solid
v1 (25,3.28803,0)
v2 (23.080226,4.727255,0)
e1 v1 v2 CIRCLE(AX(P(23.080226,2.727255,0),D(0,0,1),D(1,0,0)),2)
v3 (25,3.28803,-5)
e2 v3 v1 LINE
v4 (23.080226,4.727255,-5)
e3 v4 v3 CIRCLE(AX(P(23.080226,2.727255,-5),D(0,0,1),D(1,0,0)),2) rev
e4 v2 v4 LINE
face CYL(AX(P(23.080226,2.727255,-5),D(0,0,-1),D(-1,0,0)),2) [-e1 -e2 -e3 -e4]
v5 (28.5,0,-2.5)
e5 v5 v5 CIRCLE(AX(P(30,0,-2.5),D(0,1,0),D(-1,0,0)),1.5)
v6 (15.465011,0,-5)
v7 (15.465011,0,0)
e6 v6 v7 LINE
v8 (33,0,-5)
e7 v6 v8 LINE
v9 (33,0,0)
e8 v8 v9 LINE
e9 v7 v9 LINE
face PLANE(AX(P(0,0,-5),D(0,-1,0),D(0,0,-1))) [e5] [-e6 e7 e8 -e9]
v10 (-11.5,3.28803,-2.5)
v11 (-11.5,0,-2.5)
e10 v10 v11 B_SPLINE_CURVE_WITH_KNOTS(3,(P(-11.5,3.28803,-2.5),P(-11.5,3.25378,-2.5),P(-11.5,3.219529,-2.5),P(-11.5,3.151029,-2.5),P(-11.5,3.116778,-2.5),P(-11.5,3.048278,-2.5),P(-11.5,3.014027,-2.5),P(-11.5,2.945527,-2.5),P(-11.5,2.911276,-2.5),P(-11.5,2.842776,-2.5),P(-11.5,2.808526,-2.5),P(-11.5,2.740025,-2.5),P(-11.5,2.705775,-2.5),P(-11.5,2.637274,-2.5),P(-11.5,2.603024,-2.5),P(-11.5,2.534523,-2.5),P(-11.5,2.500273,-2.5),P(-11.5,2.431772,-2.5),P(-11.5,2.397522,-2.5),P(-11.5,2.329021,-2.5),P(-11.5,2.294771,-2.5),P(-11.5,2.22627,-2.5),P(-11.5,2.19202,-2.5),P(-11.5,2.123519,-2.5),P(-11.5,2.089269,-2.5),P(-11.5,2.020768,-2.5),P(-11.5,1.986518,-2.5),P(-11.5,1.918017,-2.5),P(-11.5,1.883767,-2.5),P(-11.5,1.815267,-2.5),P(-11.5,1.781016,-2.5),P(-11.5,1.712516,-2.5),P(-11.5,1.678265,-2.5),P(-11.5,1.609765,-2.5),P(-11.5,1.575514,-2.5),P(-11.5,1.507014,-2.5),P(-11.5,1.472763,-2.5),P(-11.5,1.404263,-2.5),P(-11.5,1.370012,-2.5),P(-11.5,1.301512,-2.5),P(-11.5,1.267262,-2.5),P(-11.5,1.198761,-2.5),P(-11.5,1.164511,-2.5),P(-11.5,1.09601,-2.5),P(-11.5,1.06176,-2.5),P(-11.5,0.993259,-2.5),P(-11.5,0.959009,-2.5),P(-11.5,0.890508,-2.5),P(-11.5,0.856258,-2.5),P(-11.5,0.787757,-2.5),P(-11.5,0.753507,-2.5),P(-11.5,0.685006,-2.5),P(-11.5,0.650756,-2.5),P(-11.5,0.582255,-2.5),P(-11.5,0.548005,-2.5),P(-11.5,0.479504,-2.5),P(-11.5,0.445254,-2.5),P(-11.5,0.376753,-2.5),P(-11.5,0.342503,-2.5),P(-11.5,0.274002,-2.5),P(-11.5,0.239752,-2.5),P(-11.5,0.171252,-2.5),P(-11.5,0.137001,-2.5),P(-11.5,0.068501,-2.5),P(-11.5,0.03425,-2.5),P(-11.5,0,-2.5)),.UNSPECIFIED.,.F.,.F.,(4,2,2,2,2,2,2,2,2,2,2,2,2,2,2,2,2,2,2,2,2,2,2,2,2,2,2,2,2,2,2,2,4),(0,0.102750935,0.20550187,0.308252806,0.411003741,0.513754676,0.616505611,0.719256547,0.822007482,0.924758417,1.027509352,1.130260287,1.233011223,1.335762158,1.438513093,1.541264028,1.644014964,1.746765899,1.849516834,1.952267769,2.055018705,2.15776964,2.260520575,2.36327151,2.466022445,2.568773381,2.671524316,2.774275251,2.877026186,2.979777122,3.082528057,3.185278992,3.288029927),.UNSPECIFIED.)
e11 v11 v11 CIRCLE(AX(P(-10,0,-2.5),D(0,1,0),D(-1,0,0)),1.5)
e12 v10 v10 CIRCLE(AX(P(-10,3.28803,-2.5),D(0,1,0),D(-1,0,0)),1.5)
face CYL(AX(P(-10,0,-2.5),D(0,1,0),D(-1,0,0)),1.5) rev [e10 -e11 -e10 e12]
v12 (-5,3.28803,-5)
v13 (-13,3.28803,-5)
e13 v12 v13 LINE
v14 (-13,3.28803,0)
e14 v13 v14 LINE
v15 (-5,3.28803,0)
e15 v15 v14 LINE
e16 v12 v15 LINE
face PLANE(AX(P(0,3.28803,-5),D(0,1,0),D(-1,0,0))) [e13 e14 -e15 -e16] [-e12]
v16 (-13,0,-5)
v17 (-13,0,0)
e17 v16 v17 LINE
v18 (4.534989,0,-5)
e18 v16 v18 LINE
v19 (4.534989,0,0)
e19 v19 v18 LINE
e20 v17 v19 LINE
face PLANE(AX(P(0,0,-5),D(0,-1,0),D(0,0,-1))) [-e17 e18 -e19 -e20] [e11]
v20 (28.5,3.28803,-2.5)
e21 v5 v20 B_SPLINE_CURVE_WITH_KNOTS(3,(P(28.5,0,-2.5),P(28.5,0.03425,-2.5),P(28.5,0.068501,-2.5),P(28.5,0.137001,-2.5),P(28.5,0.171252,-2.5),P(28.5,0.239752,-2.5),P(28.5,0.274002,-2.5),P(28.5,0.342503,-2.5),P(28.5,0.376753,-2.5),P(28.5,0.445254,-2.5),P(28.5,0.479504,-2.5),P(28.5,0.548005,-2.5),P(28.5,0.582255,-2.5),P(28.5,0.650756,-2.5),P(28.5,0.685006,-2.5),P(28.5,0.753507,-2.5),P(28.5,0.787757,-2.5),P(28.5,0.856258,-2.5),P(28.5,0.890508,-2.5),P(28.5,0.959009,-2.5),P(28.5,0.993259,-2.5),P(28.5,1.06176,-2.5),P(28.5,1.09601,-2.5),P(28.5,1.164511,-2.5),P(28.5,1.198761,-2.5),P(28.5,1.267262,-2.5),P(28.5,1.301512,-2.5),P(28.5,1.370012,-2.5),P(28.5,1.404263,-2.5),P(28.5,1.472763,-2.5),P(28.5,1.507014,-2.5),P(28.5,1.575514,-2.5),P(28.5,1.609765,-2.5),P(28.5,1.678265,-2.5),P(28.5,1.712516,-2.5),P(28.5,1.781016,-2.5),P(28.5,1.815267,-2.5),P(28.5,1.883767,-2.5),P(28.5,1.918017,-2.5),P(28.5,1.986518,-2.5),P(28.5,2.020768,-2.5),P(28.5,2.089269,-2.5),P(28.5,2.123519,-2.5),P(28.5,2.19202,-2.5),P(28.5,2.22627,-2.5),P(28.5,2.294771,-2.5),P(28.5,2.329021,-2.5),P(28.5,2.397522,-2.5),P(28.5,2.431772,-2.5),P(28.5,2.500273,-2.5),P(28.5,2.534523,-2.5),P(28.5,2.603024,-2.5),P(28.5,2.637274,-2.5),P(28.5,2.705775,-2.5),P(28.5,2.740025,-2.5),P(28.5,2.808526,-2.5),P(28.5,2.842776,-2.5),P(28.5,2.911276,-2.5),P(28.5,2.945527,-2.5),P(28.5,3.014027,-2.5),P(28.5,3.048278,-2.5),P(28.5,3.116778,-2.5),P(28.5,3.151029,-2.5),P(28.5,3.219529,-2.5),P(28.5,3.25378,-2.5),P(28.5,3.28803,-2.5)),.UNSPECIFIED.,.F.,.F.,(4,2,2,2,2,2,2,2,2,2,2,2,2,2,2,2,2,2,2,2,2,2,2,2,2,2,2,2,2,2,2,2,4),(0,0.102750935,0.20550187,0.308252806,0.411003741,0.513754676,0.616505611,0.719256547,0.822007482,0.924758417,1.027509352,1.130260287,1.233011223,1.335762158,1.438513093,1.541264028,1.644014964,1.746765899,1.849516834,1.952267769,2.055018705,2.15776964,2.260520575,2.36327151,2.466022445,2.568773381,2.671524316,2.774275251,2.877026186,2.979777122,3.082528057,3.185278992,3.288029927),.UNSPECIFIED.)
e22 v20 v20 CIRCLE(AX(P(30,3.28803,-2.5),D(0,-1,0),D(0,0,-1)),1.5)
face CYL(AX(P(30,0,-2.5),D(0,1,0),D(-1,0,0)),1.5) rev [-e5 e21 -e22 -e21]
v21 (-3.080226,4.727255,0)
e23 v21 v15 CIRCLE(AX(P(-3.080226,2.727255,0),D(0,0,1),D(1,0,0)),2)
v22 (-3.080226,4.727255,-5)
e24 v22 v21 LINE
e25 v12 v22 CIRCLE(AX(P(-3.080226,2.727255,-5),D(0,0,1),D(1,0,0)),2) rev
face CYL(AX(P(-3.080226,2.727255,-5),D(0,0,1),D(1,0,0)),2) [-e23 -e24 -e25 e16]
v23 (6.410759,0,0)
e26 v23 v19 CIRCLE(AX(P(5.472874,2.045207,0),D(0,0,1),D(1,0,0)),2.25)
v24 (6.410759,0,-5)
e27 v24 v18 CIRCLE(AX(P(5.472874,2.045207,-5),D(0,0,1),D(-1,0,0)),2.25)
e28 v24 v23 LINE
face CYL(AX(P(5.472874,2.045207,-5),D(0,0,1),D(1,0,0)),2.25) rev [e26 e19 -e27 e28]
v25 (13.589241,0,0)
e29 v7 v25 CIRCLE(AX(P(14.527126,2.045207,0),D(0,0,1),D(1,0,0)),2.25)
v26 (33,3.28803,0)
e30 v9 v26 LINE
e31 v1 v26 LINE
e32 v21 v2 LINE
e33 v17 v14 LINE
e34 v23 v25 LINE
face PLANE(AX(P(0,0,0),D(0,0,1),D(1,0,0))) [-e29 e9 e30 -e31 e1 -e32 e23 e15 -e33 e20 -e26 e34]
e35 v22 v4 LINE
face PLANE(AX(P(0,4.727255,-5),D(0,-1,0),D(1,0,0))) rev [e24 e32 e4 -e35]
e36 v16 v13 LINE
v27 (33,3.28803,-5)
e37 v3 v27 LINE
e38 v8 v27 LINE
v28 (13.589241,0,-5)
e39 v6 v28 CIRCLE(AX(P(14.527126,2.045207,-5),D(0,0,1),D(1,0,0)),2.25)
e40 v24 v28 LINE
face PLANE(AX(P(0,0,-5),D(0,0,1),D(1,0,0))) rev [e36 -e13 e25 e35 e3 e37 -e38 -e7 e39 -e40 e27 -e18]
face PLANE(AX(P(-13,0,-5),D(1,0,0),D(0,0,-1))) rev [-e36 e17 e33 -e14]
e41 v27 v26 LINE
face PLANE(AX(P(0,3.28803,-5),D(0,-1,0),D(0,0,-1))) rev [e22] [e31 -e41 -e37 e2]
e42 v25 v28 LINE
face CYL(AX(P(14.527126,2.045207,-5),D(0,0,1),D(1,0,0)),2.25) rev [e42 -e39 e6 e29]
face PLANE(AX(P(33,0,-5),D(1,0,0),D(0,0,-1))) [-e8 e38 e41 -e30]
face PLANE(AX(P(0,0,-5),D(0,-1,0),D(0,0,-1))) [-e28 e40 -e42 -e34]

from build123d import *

# Parameters (mm, degrees)
BOSS_EXTRUDE1_DEPTH     = 5
FILLET1_R               = 2
CUT_EXTRUDE1_DEPTH      = 34.538204198
CUT_EXTRUDE1_DEPTH_BACK = 34.538204198
SKETCH2_R               = 1.5
CUT_EXTRUDE2_DEPTH      = 34.709745494
CUT_EXTRUDE2_DEPTH_BACK = 34.709745494
SKETCH3_R               = 2.25


with BuildPart() as part:
    # Sketch1 → Boss-Extrude1 (new body)
    with BuildSketch(Plane.XY):
        Polygon((-5, 4.727255151), (-5, 3.288029927), (-13, 3.288029927), (-13, 0), (33, 0), (33, 3.288029927), (25, 3.288029927), (25, 4.727255151), align=None)
    extrude(amount=-BOSS_EXTRUDE1_DEPTH)

    # Fillet1
    # the kernel refuses this fillet: 2 mm, written as the material it takes off along each edge
    with BuildSketch(Plane(origin=(-5, 4.727255151, 4.799434635), x_dir=(0, -1, 0), z_dir=(0, 0, -1))) as fillet1_piece_1:
        with BuildLine():
            CenterArc((2, -1.919773854), FILLET1_R, 106.283326604, 73.716673396)
            Line((0, -1.919773854), (-0.04, -1.919773854))
            Line((-0.04, -1.919773854), (-0.04, 0))
            Line((-0.04, 0), (0, 0.04))
            ThreePointArc((0, 0.04), (0.719612612, 0.04), (1.428009728, 0.038395477))
            Line((1.428009728, 0.038395477), (1.439225223, 0))
        make_face()
    extrude(amount=14.598869269, mode=Mode.SUBTRACT)
    with BuildSketch(Plane(origin=(25, 4.727255151, 4.799434635), x_dir=(0, -1, 0), z_dir=(0, 0, -1))) as fillet1_piece_2:
        with BuildLine():
            CenterArc((2, 1.919773854), FILLET1_R, 180, 73.716673396)
            Line((0, 1.919773854), (-0.04, 1.919773854))
            Line((-0.04, 1.919773854), (-0.04, 0))
            Line((-0.04, 0), (0, -0.04))
            ThreePointArc((0, -0.04), (0.719612612, -0.04), (1.428009728, -0.038395477))
            Line((1.428009728, -0.038395477), (1.439225223, 0))
        make_face()
    extrude(amount=14.598869269, mode=Mode.SUBTRACT)

    # Sketch2 → Cut-Extrude1 (cut, two sides: drawn at the far end of the back side and taken through both)
    with BuildSketch(Plane(origin=(0, 3.288029927, 0), x_dir=(1, 0, 0), z_dir=(0, 1, 0)).offset(-CUT_EXTRUDE1_DEPTH_BACK)):
        with Locations(Location((-10, 2.5, 0), (0, 0, 180))):
            Circle(SKETCH2_R)
        with Locations(Location((30, 2.5, 0), (0, 0, 180))):
            Circle(SKETCH2_R)
    extrude(amount=CUT_EXTRUDE1_DEPTH + CUT_EXTRUDE1_DEPTH_BACK, mode=Mode.SUBTRACT)

    # Sketch3 → Cut-Extrude2 (cut, two sides: drawn at the far end of the back side and taken through both)
    with BuildSketch(Plane.XY.offset(-CUT_EXTRUDE2_DEPTH_BACK)):
        with Locations((14.527125966, 2.045207178)):
            Circle(SKETCH3_R)
        with Locations((5.472874034, 2.045207178)):
            Circle(SKETCH3_R)
    extrude(amount=CUT_EXTRUDE2_DEPTH + CUT_EXTRUDE2_DEPTH_BACK, mode=Mode.SUBTRACT)


solid = part.part
